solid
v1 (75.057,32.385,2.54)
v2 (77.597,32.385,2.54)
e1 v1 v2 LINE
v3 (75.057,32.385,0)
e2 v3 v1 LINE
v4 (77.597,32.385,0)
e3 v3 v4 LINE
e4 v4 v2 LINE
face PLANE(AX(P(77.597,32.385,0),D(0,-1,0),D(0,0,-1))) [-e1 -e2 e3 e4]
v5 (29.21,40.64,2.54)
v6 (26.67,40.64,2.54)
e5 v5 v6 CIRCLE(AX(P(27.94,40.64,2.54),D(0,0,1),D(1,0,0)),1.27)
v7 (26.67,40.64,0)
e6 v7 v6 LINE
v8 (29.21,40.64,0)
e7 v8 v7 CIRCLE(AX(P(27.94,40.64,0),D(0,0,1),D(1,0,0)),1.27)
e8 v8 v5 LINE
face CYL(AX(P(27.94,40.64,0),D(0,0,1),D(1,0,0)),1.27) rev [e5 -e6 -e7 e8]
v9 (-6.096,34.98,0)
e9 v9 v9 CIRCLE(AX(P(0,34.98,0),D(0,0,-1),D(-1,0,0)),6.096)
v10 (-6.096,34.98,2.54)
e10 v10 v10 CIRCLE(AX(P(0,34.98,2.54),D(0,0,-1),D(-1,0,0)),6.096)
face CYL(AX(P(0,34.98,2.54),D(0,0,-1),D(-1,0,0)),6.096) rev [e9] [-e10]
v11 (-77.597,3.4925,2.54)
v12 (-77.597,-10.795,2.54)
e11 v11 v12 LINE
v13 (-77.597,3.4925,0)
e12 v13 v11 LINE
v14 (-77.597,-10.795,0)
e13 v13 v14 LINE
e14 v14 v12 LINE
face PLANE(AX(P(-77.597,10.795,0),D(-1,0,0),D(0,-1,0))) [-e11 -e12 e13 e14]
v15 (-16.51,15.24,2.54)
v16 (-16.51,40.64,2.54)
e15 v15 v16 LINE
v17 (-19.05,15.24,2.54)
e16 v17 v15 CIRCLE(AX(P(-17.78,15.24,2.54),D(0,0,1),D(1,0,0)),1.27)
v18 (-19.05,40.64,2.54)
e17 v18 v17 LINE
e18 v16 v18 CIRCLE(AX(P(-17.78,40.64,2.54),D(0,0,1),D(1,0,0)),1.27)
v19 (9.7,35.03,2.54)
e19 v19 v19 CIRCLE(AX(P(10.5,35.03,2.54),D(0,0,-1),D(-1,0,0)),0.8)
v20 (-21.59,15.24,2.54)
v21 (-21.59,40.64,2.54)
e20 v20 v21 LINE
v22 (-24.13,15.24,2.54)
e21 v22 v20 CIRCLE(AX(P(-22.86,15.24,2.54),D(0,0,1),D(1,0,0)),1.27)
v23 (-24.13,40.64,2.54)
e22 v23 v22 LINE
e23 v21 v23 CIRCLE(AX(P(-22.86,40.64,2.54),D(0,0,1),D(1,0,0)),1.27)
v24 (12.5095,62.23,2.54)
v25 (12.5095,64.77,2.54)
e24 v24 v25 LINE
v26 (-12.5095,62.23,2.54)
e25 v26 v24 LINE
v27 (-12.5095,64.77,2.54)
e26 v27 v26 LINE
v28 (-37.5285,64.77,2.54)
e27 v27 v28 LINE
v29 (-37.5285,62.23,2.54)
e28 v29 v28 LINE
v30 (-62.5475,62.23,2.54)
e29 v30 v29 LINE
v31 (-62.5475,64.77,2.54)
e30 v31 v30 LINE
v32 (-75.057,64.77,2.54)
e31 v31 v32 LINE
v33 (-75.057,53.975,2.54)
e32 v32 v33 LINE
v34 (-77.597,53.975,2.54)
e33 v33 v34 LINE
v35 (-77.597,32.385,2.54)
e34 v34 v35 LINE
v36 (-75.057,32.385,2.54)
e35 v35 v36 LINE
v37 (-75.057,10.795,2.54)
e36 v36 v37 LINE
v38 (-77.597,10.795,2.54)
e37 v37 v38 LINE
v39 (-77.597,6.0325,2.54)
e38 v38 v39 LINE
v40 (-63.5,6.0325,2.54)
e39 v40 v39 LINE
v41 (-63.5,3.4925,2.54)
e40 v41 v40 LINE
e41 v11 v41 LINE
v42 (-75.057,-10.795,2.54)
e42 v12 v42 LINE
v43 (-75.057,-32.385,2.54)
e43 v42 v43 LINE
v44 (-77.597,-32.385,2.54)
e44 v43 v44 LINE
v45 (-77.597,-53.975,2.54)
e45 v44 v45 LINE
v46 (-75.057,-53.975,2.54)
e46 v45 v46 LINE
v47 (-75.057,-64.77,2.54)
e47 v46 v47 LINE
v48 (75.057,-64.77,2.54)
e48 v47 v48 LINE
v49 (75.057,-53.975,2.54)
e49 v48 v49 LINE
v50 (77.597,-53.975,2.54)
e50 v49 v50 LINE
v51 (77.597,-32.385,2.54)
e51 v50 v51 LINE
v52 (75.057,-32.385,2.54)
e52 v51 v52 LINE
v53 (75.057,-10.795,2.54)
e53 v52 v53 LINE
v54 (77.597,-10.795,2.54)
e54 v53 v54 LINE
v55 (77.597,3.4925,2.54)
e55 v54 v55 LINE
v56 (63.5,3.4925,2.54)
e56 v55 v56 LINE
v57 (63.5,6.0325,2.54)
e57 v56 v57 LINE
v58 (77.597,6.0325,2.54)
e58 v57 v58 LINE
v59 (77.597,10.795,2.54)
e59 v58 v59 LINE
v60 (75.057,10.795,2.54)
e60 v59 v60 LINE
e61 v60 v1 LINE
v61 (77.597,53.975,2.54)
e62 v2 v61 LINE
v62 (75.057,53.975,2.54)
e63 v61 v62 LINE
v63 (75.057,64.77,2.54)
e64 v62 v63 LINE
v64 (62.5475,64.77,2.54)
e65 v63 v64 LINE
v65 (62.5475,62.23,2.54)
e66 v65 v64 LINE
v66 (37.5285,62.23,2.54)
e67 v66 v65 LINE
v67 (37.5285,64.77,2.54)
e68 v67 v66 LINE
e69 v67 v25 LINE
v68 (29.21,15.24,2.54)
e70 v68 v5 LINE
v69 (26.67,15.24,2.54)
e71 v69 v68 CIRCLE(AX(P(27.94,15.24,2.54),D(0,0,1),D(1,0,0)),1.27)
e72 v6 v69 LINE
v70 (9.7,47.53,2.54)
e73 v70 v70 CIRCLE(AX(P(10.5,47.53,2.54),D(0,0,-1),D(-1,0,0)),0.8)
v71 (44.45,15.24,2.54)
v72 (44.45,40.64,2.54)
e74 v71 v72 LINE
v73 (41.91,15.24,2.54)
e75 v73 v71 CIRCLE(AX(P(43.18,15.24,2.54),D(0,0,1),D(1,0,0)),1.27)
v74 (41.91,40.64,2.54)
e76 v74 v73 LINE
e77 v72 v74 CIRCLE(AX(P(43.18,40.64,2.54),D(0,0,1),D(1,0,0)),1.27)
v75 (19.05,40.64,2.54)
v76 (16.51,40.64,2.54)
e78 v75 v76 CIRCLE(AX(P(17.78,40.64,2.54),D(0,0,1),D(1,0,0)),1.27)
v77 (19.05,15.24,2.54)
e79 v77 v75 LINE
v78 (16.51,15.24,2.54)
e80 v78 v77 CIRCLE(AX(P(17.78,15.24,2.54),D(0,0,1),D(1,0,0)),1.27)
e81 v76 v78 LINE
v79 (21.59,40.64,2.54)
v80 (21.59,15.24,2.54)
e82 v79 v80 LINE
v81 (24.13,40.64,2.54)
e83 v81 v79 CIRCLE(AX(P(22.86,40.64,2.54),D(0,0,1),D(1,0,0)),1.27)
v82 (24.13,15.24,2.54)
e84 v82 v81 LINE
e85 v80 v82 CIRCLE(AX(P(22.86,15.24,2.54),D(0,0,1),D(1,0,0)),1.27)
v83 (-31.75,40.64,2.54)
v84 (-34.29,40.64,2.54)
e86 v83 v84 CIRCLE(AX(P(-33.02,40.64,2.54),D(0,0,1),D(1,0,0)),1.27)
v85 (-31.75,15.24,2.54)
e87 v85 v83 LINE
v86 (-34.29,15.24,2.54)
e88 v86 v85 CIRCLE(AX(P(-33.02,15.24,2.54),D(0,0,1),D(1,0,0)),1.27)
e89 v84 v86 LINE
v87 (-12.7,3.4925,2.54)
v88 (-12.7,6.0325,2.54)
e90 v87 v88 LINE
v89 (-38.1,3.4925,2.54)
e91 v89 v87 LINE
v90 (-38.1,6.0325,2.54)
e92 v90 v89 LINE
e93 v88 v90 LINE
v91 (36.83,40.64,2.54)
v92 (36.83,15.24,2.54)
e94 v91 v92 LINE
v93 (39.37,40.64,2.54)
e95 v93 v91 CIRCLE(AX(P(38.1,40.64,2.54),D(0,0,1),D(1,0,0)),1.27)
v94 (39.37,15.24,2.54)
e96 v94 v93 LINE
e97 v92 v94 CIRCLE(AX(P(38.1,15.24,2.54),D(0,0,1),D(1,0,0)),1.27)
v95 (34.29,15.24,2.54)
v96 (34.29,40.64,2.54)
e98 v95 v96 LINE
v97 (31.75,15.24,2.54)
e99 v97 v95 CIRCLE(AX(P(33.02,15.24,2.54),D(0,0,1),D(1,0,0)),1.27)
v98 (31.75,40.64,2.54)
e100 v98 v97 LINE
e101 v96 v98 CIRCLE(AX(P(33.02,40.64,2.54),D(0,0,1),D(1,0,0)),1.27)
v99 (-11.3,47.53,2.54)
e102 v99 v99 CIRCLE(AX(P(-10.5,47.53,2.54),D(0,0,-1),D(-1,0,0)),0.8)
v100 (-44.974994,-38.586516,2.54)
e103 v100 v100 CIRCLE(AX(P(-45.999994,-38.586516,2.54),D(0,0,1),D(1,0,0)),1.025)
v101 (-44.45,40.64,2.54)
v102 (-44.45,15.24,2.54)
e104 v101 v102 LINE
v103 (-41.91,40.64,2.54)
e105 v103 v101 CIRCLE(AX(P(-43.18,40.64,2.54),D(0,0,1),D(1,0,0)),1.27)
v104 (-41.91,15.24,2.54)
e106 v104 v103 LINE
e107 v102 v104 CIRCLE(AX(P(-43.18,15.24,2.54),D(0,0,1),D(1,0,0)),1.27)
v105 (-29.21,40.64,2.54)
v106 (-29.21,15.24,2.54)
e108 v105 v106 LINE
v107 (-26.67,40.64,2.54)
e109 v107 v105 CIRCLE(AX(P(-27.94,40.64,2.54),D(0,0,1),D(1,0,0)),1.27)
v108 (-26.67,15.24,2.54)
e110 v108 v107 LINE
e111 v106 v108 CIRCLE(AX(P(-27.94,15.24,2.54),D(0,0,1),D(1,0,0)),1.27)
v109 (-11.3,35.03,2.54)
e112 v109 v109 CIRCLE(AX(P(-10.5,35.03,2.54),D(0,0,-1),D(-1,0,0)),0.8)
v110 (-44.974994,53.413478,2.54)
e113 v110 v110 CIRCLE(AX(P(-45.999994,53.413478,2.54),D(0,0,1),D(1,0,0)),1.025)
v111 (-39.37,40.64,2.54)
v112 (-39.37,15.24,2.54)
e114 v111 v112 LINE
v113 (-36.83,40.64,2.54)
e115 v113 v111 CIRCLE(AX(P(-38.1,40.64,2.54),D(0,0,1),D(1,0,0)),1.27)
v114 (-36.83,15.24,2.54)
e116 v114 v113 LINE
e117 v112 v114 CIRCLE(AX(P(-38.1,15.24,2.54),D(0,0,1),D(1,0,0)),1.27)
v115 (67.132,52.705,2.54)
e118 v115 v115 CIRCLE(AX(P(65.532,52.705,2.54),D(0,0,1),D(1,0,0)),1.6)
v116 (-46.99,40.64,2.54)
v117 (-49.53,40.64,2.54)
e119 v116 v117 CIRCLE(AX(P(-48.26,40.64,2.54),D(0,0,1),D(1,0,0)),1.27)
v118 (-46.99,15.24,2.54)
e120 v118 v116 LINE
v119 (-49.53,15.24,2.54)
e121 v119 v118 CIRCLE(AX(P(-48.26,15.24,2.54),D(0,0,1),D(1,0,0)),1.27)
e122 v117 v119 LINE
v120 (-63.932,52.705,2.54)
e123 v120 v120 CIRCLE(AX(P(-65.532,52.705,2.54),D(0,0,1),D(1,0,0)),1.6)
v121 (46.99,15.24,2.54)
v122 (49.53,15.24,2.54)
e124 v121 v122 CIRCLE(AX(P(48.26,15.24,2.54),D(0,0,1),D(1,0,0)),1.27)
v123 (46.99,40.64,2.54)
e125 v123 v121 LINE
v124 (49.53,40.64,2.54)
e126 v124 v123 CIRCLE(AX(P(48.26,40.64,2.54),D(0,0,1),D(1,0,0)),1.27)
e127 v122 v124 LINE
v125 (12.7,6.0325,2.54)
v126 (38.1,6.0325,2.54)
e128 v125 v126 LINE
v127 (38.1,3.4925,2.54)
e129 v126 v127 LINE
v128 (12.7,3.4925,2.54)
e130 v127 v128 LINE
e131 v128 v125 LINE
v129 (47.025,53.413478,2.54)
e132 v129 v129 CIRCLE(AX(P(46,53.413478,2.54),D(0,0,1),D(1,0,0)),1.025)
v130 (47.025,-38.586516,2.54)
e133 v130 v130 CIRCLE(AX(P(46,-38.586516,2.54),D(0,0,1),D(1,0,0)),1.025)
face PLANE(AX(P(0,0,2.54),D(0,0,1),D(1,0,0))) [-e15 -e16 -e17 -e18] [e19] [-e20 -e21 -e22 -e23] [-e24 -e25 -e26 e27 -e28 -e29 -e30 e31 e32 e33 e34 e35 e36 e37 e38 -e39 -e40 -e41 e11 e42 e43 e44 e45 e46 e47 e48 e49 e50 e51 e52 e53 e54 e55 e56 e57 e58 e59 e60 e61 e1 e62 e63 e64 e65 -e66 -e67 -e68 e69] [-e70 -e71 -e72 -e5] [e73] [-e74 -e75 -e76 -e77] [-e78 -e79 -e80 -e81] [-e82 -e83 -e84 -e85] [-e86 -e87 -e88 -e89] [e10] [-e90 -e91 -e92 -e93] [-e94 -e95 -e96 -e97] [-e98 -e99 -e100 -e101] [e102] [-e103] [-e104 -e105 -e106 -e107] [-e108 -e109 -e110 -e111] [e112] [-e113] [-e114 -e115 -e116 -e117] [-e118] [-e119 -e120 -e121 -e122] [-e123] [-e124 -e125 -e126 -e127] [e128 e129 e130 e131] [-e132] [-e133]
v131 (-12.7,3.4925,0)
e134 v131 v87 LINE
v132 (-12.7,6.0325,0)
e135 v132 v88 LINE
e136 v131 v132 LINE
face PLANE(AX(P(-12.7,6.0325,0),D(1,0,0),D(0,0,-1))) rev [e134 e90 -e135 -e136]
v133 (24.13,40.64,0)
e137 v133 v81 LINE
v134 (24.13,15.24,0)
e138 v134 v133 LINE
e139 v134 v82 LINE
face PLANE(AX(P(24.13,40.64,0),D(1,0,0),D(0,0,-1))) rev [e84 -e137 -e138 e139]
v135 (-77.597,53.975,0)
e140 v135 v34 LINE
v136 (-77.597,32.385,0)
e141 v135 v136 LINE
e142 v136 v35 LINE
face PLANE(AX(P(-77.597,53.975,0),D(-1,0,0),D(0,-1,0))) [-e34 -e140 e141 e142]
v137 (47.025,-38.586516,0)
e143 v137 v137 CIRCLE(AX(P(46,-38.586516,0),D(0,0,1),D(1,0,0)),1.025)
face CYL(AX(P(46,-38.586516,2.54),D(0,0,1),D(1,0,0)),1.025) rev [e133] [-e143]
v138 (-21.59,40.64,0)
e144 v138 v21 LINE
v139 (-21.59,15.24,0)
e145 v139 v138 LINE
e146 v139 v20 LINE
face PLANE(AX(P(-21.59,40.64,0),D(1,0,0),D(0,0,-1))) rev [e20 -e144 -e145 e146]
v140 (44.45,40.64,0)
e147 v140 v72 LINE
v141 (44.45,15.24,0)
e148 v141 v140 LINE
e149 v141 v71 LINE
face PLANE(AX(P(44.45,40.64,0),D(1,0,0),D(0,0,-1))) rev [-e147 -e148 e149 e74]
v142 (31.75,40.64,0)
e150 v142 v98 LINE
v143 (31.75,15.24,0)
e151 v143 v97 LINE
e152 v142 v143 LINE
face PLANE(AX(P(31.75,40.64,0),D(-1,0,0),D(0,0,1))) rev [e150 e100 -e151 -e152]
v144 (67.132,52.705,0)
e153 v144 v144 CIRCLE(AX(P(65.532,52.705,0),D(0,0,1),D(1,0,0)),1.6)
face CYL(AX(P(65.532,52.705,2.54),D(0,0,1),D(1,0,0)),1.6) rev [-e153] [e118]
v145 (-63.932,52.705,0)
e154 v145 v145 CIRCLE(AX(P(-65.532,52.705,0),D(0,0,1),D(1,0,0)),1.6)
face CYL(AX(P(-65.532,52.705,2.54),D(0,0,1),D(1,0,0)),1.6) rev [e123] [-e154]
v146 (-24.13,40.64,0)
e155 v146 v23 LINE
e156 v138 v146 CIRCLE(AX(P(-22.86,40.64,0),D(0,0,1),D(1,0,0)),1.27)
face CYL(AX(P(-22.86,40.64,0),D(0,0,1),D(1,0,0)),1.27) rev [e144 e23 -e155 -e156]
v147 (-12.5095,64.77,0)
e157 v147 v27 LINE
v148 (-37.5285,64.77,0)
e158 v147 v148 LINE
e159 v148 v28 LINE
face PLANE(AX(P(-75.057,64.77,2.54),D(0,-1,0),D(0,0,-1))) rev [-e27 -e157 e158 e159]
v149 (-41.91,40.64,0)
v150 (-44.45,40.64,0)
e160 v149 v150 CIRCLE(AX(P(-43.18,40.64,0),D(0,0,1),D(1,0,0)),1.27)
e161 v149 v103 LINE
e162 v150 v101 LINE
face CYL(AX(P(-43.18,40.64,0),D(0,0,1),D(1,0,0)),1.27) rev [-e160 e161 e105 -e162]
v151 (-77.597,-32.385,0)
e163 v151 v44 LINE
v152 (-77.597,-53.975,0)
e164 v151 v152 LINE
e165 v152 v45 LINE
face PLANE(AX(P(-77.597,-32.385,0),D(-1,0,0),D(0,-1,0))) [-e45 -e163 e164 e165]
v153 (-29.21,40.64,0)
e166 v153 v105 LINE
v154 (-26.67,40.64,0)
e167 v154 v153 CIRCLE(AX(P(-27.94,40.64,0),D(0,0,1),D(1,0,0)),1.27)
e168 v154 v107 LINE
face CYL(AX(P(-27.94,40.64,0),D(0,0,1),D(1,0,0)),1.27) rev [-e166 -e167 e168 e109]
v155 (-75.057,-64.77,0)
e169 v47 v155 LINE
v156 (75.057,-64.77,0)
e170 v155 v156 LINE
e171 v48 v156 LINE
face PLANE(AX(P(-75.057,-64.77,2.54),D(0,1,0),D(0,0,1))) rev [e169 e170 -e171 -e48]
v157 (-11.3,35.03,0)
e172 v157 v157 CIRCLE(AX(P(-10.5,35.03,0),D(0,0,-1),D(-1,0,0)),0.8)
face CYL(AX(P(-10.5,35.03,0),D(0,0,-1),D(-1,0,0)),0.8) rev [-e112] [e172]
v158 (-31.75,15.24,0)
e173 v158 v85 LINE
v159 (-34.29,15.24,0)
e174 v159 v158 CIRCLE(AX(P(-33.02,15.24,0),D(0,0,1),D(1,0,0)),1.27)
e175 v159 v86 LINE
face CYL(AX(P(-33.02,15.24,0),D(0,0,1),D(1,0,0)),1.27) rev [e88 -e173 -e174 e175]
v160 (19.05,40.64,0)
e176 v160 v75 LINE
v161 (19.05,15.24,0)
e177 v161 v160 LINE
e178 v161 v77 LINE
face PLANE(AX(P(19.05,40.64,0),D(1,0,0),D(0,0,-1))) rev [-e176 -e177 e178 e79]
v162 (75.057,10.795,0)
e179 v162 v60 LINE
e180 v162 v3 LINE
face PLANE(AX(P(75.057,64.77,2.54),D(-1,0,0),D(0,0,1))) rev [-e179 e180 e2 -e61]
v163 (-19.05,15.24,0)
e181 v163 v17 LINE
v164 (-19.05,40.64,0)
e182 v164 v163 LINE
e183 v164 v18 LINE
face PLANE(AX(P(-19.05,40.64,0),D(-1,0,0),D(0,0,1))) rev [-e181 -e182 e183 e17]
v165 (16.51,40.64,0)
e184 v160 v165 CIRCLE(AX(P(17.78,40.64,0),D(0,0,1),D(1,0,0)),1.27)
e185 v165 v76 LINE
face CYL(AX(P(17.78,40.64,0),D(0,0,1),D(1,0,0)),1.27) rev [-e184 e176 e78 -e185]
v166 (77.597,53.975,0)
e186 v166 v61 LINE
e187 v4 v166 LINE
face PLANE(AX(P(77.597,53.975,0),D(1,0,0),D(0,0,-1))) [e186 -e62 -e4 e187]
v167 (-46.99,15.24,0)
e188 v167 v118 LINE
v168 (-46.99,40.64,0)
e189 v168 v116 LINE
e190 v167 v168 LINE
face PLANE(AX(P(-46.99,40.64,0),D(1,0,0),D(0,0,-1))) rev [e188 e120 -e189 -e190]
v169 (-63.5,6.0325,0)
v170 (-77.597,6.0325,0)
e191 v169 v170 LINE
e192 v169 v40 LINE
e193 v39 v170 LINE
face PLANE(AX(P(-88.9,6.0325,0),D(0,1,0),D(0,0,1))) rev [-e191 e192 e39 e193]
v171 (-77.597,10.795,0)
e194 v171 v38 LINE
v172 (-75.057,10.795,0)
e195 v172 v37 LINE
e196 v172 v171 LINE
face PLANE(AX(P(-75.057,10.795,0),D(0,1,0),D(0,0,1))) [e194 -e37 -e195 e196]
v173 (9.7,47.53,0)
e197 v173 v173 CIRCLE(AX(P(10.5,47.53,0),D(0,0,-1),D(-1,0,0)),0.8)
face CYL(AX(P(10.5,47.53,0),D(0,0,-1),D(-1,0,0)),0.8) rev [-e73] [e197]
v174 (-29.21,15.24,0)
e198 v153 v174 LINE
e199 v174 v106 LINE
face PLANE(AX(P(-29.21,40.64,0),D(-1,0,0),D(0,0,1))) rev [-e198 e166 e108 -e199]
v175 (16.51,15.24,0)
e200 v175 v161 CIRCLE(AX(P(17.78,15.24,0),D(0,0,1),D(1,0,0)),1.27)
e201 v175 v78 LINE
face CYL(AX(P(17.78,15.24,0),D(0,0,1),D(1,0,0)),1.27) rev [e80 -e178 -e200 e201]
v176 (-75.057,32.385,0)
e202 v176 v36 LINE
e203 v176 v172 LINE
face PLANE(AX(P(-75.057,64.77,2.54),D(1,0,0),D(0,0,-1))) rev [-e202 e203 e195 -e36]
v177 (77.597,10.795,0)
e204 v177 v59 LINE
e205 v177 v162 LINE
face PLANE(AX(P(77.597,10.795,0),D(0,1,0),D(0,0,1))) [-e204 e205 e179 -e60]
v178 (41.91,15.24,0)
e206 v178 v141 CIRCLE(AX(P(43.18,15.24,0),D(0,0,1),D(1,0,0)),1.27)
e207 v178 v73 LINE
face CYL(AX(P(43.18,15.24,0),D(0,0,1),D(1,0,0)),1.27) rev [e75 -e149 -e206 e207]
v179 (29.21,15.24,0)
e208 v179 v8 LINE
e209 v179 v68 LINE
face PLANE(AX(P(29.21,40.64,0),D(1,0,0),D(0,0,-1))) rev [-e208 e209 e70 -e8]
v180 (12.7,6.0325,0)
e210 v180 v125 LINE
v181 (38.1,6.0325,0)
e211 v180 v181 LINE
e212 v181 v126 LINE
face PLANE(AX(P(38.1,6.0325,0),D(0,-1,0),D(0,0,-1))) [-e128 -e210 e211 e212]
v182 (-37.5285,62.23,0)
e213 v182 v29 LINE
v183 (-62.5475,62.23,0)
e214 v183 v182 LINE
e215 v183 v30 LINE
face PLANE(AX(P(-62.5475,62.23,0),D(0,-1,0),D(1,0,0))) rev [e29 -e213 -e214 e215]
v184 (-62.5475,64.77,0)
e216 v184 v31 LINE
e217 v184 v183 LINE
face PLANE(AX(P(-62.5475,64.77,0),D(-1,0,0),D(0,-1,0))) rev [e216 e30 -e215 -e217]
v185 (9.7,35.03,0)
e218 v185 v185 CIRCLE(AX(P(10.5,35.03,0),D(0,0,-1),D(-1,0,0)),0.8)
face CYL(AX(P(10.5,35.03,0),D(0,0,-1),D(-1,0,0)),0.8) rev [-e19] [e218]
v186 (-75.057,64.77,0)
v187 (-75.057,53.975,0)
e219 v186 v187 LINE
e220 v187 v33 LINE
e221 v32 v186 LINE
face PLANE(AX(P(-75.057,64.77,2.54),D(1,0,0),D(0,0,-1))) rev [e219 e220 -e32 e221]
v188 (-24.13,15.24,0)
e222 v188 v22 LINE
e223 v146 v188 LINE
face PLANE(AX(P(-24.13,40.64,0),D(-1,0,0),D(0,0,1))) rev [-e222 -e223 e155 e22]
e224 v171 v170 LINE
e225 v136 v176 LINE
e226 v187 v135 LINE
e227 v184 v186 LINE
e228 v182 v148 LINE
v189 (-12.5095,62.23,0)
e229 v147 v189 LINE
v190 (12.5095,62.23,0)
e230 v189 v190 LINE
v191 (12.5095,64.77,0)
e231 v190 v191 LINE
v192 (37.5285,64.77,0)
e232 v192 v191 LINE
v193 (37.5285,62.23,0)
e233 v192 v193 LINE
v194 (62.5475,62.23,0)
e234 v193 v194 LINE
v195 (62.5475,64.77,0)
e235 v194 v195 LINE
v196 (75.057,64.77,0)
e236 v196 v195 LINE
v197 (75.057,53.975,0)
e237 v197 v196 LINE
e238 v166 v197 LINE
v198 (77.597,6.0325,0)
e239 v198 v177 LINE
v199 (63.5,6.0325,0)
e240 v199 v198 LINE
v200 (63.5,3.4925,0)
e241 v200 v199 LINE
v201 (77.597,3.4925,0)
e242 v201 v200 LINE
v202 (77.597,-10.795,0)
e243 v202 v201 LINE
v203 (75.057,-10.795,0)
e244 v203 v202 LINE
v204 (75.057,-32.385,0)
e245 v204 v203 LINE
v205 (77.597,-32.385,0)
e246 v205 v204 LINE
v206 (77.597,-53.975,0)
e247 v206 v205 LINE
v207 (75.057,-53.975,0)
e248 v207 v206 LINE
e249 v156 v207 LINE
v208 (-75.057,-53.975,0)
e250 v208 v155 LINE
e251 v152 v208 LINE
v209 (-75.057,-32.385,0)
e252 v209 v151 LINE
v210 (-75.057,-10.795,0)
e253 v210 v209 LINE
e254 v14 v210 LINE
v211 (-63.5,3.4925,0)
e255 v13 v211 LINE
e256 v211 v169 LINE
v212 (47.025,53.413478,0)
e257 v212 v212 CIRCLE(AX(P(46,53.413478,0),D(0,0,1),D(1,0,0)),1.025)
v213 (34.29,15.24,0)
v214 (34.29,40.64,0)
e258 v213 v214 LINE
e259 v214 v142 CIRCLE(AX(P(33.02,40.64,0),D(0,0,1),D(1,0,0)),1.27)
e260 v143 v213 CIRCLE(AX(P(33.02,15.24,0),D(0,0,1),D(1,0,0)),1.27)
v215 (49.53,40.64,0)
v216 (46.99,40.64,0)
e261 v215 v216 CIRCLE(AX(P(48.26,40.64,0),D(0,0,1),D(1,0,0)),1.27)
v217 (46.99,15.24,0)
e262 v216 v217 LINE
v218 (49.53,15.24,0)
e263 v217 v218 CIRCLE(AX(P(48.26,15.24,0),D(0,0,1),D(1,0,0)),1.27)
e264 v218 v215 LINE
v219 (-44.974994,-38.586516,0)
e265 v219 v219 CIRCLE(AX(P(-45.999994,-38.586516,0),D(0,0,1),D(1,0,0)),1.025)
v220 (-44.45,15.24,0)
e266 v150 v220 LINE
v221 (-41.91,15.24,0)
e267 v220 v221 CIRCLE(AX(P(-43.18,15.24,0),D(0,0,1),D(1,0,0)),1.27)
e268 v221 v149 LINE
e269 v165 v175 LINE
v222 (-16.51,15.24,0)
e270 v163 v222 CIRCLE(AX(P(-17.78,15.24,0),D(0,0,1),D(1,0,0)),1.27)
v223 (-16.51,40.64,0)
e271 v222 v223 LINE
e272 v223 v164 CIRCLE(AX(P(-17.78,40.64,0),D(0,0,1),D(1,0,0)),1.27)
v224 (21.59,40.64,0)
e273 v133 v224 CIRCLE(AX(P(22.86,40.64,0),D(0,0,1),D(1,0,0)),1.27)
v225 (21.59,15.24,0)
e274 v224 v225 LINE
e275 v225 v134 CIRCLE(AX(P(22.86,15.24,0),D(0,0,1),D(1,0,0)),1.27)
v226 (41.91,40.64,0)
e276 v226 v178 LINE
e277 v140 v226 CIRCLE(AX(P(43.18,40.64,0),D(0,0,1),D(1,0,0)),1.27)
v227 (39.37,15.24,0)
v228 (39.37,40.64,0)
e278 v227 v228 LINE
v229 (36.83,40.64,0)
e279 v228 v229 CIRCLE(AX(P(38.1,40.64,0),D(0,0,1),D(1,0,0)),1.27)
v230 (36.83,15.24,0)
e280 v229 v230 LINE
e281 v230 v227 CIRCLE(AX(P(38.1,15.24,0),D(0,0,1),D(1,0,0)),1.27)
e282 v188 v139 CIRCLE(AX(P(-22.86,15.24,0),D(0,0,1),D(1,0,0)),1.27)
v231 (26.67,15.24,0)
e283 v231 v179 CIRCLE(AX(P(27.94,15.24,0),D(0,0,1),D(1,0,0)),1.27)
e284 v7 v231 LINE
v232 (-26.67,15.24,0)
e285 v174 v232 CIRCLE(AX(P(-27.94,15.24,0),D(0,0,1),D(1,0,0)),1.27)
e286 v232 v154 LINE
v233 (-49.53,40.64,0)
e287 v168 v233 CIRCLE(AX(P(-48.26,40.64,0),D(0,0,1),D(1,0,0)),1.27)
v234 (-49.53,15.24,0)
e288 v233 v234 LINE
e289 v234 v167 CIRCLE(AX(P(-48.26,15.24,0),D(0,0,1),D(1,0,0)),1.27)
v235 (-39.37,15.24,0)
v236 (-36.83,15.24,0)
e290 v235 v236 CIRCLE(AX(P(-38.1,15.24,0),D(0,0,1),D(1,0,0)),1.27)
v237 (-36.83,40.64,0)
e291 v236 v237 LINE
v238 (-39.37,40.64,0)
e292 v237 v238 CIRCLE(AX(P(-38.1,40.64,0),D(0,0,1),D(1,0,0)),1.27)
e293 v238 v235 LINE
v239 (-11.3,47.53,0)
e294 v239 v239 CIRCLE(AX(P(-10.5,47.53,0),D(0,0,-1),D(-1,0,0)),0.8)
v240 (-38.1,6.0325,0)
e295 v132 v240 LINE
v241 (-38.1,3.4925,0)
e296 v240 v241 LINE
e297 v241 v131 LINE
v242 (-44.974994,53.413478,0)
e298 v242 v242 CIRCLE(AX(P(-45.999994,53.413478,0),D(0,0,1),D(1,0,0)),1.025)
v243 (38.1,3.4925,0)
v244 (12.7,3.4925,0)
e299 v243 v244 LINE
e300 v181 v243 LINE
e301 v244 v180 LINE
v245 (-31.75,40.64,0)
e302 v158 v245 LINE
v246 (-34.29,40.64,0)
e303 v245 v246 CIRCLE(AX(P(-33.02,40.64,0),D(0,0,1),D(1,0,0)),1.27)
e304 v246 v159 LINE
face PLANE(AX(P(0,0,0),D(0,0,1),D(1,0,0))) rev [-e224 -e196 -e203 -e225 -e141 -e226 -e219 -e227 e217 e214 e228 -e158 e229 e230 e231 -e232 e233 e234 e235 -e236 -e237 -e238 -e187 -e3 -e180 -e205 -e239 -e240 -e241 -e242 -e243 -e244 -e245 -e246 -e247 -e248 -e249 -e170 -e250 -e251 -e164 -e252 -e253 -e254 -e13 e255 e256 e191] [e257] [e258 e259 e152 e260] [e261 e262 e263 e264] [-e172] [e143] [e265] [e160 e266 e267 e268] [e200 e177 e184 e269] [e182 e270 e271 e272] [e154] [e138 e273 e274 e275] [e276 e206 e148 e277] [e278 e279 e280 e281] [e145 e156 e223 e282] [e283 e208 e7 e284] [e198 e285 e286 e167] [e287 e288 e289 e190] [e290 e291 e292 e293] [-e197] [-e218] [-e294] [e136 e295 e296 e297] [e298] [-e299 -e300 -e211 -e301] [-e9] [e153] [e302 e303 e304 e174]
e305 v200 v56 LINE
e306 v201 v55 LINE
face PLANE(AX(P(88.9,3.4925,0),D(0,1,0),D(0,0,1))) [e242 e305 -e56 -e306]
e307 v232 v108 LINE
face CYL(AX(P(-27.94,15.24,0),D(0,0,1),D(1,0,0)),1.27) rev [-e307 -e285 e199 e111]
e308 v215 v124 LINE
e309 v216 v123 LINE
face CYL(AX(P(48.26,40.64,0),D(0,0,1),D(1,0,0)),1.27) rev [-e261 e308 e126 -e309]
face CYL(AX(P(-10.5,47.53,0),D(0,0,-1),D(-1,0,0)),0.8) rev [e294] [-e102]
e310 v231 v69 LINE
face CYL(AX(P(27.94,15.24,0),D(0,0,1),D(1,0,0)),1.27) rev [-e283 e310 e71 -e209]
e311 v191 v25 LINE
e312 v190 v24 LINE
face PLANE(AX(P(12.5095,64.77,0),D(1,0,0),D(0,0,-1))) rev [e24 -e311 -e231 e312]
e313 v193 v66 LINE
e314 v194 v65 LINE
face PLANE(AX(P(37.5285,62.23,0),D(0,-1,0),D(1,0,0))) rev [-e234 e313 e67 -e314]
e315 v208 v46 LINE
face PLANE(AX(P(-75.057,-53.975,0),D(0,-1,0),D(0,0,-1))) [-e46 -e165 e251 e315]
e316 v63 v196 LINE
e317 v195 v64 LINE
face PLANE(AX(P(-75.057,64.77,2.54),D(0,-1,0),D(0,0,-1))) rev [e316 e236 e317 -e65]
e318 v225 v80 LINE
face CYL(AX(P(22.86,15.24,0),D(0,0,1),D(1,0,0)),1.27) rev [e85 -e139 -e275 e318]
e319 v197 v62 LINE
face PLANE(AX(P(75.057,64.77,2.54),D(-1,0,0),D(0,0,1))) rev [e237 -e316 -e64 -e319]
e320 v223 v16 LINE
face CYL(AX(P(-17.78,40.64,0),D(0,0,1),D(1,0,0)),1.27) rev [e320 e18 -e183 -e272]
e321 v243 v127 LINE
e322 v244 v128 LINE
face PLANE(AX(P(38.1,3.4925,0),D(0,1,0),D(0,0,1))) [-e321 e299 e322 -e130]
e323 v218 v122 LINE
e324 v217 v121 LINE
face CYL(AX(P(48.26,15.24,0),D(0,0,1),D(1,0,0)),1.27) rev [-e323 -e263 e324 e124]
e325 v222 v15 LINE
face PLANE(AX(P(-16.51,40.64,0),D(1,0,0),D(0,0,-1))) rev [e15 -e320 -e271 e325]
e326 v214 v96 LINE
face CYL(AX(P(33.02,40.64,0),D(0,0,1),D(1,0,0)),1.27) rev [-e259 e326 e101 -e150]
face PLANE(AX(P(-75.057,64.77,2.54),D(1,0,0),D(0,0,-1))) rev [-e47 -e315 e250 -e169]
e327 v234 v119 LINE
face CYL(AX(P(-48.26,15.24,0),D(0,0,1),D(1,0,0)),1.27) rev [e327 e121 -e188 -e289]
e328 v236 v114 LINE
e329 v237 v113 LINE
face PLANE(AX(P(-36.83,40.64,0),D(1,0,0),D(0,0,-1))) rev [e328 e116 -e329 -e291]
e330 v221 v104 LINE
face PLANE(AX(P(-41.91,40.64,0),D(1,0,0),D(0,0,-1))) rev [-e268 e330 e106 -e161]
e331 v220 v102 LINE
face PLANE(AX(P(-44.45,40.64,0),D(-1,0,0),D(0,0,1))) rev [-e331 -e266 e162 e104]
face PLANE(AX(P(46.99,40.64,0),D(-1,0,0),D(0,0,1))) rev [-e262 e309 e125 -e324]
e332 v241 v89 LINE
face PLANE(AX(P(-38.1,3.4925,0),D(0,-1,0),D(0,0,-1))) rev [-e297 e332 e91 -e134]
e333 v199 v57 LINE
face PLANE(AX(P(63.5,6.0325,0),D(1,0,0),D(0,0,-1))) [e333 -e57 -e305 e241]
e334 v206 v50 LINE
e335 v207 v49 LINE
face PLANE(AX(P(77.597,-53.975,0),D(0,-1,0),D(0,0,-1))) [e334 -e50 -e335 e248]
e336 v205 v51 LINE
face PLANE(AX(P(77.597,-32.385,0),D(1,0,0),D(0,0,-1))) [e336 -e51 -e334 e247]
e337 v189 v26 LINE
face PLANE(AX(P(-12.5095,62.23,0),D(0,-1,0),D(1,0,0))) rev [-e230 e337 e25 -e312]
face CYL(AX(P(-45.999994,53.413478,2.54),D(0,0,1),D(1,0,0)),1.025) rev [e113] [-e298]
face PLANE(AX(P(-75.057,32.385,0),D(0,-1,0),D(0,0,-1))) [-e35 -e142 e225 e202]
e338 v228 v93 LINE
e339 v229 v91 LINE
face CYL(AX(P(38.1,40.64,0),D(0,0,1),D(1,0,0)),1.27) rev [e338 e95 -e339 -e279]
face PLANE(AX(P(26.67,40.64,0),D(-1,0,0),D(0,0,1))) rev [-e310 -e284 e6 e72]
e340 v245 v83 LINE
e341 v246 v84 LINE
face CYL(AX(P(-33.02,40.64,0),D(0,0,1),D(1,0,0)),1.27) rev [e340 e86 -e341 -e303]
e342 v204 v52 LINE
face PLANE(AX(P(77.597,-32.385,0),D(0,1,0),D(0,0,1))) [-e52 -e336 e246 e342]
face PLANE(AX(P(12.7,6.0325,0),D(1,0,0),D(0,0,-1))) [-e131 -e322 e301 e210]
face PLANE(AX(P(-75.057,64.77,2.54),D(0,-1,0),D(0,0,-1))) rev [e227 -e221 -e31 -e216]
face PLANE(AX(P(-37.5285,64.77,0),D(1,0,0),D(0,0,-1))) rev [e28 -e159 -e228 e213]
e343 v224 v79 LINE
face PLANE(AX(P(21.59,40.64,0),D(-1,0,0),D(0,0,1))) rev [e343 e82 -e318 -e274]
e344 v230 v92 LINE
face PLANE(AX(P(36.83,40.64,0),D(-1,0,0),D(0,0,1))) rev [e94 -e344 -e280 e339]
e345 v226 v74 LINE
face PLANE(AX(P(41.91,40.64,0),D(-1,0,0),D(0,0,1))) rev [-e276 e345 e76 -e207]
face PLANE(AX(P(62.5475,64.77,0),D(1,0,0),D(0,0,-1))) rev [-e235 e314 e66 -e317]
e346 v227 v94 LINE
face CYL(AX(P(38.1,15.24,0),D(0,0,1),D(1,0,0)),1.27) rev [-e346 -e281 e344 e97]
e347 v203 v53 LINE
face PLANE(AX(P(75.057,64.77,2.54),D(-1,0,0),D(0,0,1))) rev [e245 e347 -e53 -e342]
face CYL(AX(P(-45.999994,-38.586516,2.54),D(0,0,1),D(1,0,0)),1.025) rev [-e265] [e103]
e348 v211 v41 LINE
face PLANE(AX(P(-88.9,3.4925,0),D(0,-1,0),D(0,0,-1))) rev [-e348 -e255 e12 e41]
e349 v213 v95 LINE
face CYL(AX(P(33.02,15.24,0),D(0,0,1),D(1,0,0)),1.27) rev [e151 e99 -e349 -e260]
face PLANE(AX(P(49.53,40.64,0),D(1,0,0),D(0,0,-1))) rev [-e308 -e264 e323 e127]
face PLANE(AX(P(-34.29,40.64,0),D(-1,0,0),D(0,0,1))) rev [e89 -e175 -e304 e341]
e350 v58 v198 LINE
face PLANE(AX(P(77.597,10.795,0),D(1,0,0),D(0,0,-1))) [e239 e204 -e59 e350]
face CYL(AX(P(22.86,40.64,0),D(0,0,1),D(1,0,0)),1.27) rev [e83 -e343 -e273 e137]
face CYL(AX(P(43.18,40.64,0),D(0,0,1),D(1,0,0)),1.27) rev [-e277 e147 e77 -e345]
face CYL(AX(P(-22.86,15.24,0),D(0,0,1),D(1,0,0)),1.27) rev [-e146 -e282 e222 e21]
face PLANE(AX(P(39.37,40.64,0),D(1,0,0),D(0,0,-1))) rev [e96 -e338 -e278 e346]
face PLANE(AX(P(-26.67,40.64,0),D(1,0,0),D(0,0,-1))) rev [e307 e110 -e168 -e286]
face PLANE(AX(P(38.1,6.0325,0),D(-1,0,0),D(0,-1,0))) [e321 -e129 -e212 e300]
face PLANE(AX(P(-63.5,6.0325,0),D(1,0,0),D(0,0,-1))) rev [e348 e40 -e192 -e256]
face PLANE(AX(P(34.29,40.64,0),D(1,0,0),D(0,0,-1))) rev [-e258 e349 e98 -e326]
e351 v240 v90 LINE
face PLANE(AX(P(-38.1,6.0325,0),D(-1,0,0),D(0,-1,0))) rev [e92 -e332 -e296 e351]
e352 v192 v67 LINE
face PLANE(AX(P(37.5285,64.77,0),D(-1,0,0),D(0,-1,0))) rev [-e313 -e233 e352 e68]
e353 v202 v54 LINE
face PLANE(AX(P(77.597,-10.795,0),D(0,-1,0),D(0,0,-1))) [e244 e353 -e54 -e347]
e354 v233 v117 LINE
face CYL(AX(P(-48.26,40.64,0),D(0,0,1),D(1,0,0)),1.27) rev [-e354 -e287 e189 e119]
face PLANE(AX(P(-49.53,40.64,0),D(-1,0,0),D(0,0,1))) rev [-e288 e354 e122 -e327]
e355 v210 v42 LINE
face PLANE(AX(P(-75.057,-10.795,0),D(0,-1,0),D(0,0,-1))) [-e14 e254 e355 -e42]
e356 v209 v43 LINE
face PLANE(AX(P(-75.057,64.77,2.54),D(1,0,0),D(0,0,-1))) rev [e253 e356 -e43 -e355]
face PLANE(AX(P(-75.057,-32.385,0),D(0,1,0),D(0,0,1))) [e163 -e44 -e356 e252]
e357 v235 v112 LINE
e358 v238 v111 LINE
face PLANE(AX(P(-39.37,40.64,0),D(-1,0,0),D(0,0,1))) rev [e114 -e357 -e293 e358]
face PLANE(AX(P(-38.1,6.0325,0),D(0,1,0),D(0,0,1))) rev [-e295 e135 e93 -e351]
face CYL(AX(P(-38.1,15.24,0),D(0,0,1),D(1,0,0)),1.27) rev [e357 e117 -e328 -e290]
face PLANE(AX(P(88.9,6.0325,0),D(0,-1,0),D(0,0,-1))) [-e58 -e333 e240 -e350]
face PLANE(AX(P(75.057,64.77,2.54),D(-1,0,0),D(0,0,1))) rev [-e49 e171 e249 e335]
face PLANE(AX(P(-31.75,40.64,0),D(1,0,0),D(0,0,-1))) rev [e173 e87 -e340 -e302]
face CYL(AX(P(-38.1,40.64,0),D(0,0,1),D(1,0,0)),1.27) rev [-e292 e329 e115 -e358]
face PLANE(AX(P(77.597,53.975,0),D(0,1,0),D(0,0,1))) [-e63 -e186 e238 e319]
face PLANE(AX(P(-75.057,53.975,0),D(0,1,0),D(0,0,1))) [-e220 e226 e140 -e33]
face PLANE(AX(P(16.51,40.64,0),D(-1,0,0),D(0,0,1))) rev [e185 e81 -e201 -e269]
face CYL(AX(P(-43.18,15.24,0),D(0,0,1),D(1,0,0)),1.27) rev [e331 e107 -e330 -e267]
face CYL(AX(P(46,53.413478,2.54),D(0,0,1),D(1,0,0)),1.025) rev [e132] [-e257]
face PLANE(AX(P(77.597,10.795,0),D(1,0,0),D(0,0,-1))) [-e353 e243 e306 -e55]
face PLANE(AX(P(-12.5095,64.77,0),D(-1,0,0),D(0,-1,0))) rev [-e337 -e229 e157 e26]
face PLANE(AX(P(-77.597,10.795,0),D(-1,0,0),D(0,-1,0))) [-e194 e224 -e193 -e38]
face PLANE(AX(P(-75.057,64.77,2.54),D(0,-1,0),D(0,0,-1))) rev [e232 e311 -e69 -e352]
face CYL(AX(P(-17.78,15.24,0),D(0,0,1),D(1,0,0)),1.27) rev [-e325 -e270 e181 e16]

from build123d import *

# Parameters (mm, degrees)
SKETCH1_W                      = 150.114
SKETCH1_H                      = 129.54
BOSS_EXTRUDE1_DEPTH            = 2.54
SKETCH4_W                      = 25.019
SKETCH4_H                      = 2.54
CUT_EXTRUDE1_DEPTH             = 100.172363837
LPATTERN1_COUNT                = 3
LPATTERN1_PITCH                = 50.038
SKETCH5_W                      = 2.54
SKETCH5_H                      = 21.59
BOSS_EXTRUDE3_DEPTH            = 2.54
LPATTERN2_COUNT                = 3
LPATTERN2_PITCH                = 43.18
LPATTERN2_COUNT_DIR2           = 2
LPATTERN2_PITCH_DIR2           = 152.654
TAP_DRILL_FOR_M2_5X0_45_TAP1_D = 2.05
M3_CLEARANCE_HOLE1_D           = 3.2
M3_CLEARANCE_HOLE1_DEPTH       = 9.398
M3_CLEARANCE_HOLE1_TIP         = 0.96137699
SKETCH10_R                     = 6.096
CUT_EXTRUDE2_DEPTH             = 102.108352321
TAP_DRILL_FOR_M2X0_4_TAP1_D    = 1.6
SKETCH13_W                     = 25.4
SKETCH13_H                     = 2.54
CUT_EXTRUDE3_DEPTH             = 102.108352321
CUT_EXTRUDE4_DEPTH             = 102.108352321
LPATTERN3_COUNT                = 7
LPATTERN3_PITCH                = 5.08
LPATTERN3_COUNT_DIR2           = 14
LPATTERN3_PITCH_DIR2           = 5.08


with BuildPart() as part:
    # Sketch1 → Boss-Extrude1 (new body)
    with BuildSketch(Plane.XY):
        Rectangle(SKETCH1_W, SKETCH1_H)
    extrude(amount=BOSS_EXTRUDE1_DEPTH)

    # Sketch4 → Cut-Extrude1 (cut, through all)
    with BuildSketch(Plane.XY.offset(2.54)):
        with Locations((-50.038, 63.5)):
            Rectangle(SKETCH4_W, SKETCH4_H)
    cut_extrude1 = extrude(amount=-CUT_EXTRUDE1_DEPTH, mode=Mode.SUBTRACT)

    # LPattern1: Cut-Extrude1 ×3
    with Locations(*[(i * LPATTERN1_PITCH, 0, 0) for i in range(1, LPATTERN1_COUNT)]):
        add(cut_extrude1, mode=Mode.SUBTRACT)

    # Sketch5 → Boss-Extrude3 (add)
    with BuildSketch(Plane.XY.offset(2.54)):
        with Locations((-76.327, 43.18)):
            Rectangle(SKETCH5_W, SKETCH5_H)
    boss_extrude3 = extrude(amount=-BOSS_EXTRUDE3_DEPTH)

    # LPattern2: Boss-Extrude3 3 × 2
    with Locations(*[(j * LPATTERN2_PITCH_DIR2, -i * LPATTERN2_PITCH, 0) for i in range(LPATTERN2_COUNT) for j in range(LPATTERN2_COUNT_DIR2) if (i, j) != (0, 0)]):
        add(boss_extrude3)

    # Tap Drill for M2.5x0.45 Tap1 (through all)
    with Locations(Plane.XY.offset(2.54)):
        with Locations((46, 53.413478245), (-45.9999938, 53.413478245), (-45.9999938, -38.586515555), (46, -38.586515555)):
            Hole(TAP_DRILL_FOR_M2_5X0_45_TAP1_D / 2)

    # M3 Clearance Hole1
    with Locations(Plane.XY.offset(2.54)):
        with Locations((-65.532, 52.705), (65.532, 52.705)):
            Hole(M3_CLEARANCE_HOLE1_D / 2, depth=M3_CLEARANCE_HOLE1_DEPTH)
            with Locations((0, 0, -(M3_CLEARANCE_HOLE1_DEPTH + M3_CLEARANCE_HOLE1_TIP / 2))):  # 118° drill point
                Cone(0, M3_CLEARANCE_HOLE1_D / 2, M3_CLEARANCE_HOLE1_TIP, mode=Mode.SUBTRACT)

    # Sketch10 → Cut-Extrude2 (cut, through all)
    with BuildSketch(Plane(origin=(0, 0, 0), x_dir=(-1, 0, 0), z_dir=(0, 0, -1))):
        with Locations((0, 34.98)):
            Circle(SKETCH10_R)
    extrude(amount=-CUT_EXTRUDE2_DEPTH, mode=Mode.SUBTRACT)

    # Tap Drill for M2x0.4 Tap1 (through all)
    with Locations(Plane(origin=(0, 0, 0), x_dir=(-1, 0, 0), z_dir=(0, 0, -1))):
        with Locations((-10.5, 47.53), (-10.5, 35.03), (10.5, 47.53), (10.5, 35.03)):
            Hole(TAP_DRILL_FOR_M2X0_4_TAP1_D / 2)

    # Sketch13 → Cut-Extrude3 (cut, through all)
    with BuildSketch(Plane.XY.offset(2.54)):
        with Locations((-25.4, 4.7625)):
            Rectangle(SKETCH13_W, SKETCH13_H)
        with Locations((-76.2, 4.7625)):
            Rectangle(SKETCH13_W, SKETCH13_H)
    cut_extrude3 = extrude(amount=-CUT_EXTRUDE3_DEPTH, mode=Mode.SUBTRACT)

    # Mirror1: Cut-Extrude3 across plane
    add(cut_extrude3.mirror(Plane(origin=(0, 0, 0), x_dir=(0, 0, 1), z_dir=(1, 0, 0))), mode=Mode.SUBTRACT)

    # Sketch14 → Cut-Extrude4 (cut, through all)
    with BuildSketch(Plane.XY.offset(2.54)):
        with BuildLine():
            Line((-16.51, 40.64), (-16.51, 15.24))
            ThreePointArc((-16.51, 15.24), (-17.78, 13.97), (-19.05, 15.24))
            Line((-19.05, 15.24), (-19.05, 40.64))
            ThreePointArc((-19.05, 40.64), (-17.78, 41.91), (-16.51, 40.64))
        make_face()
    cut_extrude4 = extrude(amount=-CUT_EXTRUDE4_DEPTH, mode=Mode.SUBTRACT)

    # LPattern3: Cut-Extrude4 7 × 14, 42 skipped
    with Locations(*[Vector(-1, 0, 0) * (i * LPATTERN3_PITCH) + Vector(1, 0, 0) * (j * LPATTERN3_PITCH_DIR2) for i in range(LPATTERN3_COUNT) for j in range(LPATTERN3_COUNT_DIR2) if (i, j) not in ((0, 0), (0, 1), (0, 2), (0, 3), (0, 4), (0, 5), (0, 6), (1, 2), (1, 3), (1, 4), (1, 5), (1, 6), (1, 7), (2, 3), (2, 4), (2, 5), (2, 6), (2, 7), (2, 8), (3, 4), (3, 5), (3, 6), (3, 7), (3, 8), (3, 9), (4, 5), (4, 6), (4, 7), (4, 8), (4, 9), (4, 10), (5, 6), (5, 7), (5, 8), (5, 9), (5, 10), (5, 11), (6, 7), (6, 8), (6, 9), (6, 10), (6, 11), (6, 12))]):
        add(cut_extrude4, mode=Mode.SUBTRACT)


solid = part.part
